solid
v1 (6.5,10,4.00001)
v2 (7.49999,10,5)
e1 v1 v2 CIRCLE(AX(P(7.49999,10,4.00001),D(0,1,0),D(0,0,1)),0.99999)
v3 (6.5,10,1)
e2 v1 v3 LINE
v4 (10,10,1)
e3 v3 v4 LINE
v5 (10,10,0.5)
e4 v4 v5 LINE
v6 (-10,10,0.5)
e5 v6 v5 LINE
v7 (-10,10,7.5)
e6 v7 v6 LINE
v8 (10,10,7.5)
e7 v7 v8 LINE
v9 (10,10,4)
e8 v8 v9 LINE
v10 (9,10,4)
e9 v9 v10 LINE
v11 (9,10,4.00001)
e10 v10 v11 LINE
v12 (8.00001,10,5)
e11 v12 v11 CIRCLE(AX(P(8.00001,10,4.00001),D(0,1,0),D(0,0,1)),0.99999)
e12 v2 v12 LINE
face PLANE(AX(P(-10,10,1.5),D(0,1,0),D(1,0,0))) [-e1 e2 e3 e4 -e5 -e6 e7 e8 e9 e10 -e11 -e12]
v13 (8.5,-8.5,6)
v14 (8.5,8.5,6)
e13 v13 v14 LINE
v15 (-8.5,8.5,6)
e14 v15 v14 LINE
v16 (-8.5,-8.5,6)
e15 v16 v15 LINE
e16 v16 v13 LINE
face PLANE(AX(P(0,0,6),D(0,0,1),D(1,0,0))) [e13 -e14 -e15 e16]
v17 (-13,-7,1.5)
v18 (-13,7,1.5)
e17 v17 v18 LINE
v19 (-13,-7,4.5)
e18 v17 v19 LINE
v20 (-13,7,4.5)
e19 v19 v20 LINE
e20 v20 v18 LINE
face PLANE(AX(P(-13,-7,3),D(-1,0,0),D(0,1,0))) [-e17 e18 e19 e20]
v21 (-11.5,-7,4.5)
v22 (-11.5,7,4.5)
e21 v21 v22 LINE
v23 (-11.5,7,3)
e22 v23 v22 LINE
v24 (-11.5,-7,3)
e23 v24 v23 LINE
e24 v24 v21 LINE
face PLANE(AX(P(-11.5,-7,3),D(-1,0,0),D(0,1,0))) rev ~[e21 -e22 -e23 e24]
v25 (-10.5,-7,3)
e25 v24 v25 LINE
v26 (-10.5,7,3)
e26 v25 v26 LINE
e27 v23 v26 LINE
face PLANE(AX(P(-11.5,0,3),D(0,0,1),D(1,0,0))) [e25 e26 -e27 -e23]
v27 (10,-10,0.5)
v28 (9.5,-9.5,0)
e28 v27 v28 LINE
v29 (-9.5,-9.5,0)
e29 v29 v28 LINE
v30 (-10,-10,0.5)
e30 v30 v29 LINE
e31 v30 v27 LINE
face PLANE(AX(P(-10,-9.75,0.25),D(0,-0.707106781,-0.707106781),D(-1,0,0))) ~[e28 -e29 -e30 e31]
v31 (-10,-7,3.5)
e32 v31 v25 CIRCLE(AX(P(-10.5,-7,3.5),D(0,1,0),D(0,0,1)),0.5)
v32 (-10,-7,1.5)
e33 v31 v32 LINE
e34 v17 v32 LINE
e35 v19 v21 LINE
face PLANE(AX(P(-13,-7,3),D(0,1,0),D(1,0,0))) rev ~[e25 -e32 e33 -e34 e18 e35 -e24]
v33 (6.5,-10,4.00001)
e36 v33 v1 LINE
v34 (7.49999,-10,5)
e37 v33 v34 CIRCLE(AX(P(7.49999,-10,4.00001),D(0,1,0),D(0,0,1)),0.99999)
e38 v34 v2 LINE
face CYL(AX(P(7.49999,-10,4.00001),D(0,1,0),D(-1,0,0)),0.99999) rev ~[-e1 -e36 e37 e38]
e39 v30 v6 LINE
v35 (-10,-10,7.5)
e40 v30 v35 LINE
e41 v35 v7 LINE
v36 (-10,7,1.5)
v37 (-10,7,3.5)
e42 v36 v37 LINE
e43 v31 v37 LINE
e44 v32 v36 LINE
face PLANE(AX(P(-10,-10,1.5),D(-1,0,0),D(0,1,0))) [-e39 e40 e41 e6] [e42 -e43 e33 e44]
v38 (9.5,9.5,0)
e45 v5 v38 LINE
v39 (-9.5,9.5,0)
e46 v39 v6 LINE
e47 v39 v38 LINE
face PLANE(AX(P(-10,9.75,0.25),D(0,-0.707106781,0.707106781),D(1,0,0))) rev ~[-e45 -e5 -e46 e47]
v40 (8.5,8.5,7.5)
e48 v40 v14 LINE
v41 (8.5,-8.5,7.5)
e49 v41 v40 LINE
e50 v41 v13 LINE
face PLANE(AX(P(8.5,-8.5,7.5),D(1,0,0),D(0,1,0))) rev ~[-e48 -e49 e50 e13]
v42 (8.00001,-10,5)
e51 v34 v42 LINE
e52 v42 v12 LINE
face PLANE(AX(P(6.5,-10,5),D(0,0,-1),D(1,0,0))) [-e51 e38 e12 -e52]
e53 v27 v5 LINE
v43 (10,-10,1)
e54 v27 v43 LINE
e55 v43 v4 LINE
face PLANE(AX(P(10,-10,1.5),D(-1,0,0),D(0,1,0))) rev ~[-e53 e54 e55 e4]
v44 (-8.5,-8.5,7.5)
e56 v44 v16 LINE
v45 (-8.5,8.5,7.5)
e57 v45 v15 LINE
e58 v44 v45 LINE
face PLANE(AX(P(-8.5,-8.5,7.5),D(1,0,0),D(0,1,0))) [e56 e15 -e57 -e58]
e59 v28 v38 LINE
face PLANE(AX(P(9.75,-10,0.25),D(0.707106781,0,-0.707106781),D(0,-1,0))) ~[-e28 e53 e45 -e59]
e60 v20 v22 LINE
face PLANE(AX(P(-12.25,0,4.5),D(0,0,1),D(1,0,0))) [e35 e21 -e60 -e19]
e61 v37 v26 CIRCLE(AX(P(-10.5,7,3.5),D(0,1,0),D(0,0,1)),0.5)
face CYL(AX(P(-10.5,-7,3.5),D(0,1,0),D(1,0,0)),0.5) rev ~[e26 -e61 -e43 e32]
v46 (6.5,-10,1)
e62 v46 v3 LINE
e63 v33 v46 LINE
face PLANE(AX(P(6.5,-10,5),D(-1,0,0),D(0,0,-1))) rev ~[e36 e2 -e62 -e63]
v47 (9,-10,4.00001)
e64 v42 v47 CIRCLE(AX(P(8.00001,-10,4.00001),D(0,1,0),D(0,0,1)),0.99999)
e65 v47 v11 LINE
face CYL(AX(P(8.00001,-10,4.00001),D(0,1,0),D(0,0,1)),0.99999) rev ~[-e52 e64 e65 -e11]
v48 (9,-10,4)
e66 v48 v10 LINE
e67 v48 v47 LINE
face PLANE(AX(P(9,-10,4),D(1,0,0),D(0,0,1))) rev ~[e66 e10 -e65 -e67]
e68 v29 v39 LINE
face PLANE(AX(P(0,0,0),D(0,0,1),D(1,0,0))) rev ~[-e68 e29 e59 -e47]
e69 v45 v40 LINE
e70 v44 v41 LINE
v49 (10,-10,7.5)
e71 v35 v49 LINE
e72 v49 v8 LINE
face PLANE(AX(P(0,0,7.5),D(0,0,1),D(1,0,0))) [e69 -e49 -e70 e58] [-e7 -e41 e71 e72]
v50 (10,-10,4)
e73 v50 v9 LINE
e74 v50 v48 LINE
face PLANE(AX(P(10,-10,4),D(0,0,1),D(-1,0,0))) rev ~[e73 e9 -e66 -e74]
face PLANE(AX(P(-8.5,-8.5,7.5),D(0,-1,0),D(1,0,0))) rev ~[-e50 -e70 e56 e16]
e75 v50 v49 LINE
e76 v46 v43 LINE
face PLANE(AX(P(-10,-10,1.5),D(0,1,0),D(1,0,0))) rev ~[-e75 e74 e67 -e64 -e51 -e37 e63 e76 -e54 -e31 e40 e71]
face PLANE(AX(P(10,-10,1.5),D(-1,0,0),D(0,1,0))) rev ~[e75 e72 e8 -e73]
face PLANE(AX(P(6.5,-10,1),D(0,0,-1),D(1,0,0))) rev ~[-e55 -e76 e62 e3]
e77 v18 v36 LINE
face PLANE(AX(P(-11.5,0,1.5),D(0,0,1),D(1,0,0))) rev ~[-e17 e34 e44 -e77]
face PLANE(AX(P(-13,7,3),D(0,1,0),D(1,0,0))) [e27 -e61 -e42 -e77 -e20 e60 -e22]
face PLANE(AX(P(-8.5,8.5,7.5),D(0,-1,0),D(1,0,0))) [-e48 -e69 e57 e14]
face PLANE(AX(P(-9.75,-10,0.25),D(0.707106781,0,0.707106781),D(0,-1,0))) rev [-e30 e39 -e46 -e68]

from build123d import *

# Parameters (mm, degrees)
F0_W      = 20
F0_H      = 20
F1_DEPTH  = 1.5
F2_W      = 3
F2_H      = 14
F3_DEPTH  = 1.5
F4_W      = 1.5
F4_H      = 14
F5_DEPTH  = 1.5
F6_DEPTH  = 6
F7_W      = 17
F7_H      = 17
F8_DEPTH  = 1.5
F9_W      = 2.5
F9_H      = 1
F10_DEPTH = 20
F11_R     = 0.99999
F12_R     = 0.5
F13_SIZE  = 0.5


# Not quite as in the source:
# - a fillet or chamfer is up to 0.001 mm smaller than in the source, because OpenCascade refuses the exact size


with BuildPart() as f1:
    # F0 (on Top) → F1 (new body)
    with BuildSketch(Plane.XY):
        Rectangle(F0_W, F0_H)
    extrude(amount=F1_DEPTH)

    # F6 (add): a face of the model
    f6_faces = [f1.faces().sort_by_distance(p)[0] for p in [
        (0, 0, 1.5),
    ]]


with BuildPart() as f3:
    # F2 (on face) → F3 (new body)
    with BuildSketch(Plane.XY.offset(1.5)):
        with Locations((-11.5, 0)):
            Rectangle(F2_W, F2_H)
    extrude(amount=F3_DEPTH)

    # F4 (on face) → F5 (join)
    with BuildSketch(Plane.XY.offset(3)):
        with Locations((-12.25, 0)):
            Rectangle(F4_W, F4_H)
    extrude(amount=F5_DEPTH)


with BuildPart() as f1_1:
    add(f1.part)

    add(f3.part)  # F6 merges F3
    extrude(f6_faces, amount=F6_DEPTH)

    # F7 (on face) → F8 (cut)
    with BuildSketch(Plane.XY.offset(7.5)):
        Rectangle(F7_W, F7_H)
    extrude(amount=-F8_DEPTH, mode=Mode.SUBTRACT)

    # F9 (on face) → F10 (cut, through all)
    with BuildSketch(Plane.XZ.offset(10)):
        Polygon((6.5, 1), (10, 1), (10, 4), (9, 4), (6.5, 4), align=None)
        with Locations((7.75, 4.5)):
            Rectangle(F9_W, F9_H)
    extrude(amount=-F10_DEPTH, mode=Mode.SUBTRACT)

    # F11 (radius 1 in the source; OpenCascade refuses exactly that, so slightly less here)
    f11_edges = [f1_1.edges().sort_by_distance(p)[0] for p in [
        (6.5, 0, 5),
        (9, 0, 5),
    ]]
    fillet(f11_edges, radius=F11_R)

    # F12
    f12_edges = [f1_1.edges().sort_by_distance(p)[0] for p in [
        (-10, 0, 3),
    ]]
    fillet(f12_edges, radius=F12_R)

    # F13
    f13_edges = [f1_1.edges().sort_by_distance(p)[0] for p in [
        (0, -10, 0),
        (10, 0, 0),
        (0, 10, 0),
        (-10, 0, 0),
    ]]
    chamfer(f13_edges, length=F13_SIZE)


solid = f1_1.part
